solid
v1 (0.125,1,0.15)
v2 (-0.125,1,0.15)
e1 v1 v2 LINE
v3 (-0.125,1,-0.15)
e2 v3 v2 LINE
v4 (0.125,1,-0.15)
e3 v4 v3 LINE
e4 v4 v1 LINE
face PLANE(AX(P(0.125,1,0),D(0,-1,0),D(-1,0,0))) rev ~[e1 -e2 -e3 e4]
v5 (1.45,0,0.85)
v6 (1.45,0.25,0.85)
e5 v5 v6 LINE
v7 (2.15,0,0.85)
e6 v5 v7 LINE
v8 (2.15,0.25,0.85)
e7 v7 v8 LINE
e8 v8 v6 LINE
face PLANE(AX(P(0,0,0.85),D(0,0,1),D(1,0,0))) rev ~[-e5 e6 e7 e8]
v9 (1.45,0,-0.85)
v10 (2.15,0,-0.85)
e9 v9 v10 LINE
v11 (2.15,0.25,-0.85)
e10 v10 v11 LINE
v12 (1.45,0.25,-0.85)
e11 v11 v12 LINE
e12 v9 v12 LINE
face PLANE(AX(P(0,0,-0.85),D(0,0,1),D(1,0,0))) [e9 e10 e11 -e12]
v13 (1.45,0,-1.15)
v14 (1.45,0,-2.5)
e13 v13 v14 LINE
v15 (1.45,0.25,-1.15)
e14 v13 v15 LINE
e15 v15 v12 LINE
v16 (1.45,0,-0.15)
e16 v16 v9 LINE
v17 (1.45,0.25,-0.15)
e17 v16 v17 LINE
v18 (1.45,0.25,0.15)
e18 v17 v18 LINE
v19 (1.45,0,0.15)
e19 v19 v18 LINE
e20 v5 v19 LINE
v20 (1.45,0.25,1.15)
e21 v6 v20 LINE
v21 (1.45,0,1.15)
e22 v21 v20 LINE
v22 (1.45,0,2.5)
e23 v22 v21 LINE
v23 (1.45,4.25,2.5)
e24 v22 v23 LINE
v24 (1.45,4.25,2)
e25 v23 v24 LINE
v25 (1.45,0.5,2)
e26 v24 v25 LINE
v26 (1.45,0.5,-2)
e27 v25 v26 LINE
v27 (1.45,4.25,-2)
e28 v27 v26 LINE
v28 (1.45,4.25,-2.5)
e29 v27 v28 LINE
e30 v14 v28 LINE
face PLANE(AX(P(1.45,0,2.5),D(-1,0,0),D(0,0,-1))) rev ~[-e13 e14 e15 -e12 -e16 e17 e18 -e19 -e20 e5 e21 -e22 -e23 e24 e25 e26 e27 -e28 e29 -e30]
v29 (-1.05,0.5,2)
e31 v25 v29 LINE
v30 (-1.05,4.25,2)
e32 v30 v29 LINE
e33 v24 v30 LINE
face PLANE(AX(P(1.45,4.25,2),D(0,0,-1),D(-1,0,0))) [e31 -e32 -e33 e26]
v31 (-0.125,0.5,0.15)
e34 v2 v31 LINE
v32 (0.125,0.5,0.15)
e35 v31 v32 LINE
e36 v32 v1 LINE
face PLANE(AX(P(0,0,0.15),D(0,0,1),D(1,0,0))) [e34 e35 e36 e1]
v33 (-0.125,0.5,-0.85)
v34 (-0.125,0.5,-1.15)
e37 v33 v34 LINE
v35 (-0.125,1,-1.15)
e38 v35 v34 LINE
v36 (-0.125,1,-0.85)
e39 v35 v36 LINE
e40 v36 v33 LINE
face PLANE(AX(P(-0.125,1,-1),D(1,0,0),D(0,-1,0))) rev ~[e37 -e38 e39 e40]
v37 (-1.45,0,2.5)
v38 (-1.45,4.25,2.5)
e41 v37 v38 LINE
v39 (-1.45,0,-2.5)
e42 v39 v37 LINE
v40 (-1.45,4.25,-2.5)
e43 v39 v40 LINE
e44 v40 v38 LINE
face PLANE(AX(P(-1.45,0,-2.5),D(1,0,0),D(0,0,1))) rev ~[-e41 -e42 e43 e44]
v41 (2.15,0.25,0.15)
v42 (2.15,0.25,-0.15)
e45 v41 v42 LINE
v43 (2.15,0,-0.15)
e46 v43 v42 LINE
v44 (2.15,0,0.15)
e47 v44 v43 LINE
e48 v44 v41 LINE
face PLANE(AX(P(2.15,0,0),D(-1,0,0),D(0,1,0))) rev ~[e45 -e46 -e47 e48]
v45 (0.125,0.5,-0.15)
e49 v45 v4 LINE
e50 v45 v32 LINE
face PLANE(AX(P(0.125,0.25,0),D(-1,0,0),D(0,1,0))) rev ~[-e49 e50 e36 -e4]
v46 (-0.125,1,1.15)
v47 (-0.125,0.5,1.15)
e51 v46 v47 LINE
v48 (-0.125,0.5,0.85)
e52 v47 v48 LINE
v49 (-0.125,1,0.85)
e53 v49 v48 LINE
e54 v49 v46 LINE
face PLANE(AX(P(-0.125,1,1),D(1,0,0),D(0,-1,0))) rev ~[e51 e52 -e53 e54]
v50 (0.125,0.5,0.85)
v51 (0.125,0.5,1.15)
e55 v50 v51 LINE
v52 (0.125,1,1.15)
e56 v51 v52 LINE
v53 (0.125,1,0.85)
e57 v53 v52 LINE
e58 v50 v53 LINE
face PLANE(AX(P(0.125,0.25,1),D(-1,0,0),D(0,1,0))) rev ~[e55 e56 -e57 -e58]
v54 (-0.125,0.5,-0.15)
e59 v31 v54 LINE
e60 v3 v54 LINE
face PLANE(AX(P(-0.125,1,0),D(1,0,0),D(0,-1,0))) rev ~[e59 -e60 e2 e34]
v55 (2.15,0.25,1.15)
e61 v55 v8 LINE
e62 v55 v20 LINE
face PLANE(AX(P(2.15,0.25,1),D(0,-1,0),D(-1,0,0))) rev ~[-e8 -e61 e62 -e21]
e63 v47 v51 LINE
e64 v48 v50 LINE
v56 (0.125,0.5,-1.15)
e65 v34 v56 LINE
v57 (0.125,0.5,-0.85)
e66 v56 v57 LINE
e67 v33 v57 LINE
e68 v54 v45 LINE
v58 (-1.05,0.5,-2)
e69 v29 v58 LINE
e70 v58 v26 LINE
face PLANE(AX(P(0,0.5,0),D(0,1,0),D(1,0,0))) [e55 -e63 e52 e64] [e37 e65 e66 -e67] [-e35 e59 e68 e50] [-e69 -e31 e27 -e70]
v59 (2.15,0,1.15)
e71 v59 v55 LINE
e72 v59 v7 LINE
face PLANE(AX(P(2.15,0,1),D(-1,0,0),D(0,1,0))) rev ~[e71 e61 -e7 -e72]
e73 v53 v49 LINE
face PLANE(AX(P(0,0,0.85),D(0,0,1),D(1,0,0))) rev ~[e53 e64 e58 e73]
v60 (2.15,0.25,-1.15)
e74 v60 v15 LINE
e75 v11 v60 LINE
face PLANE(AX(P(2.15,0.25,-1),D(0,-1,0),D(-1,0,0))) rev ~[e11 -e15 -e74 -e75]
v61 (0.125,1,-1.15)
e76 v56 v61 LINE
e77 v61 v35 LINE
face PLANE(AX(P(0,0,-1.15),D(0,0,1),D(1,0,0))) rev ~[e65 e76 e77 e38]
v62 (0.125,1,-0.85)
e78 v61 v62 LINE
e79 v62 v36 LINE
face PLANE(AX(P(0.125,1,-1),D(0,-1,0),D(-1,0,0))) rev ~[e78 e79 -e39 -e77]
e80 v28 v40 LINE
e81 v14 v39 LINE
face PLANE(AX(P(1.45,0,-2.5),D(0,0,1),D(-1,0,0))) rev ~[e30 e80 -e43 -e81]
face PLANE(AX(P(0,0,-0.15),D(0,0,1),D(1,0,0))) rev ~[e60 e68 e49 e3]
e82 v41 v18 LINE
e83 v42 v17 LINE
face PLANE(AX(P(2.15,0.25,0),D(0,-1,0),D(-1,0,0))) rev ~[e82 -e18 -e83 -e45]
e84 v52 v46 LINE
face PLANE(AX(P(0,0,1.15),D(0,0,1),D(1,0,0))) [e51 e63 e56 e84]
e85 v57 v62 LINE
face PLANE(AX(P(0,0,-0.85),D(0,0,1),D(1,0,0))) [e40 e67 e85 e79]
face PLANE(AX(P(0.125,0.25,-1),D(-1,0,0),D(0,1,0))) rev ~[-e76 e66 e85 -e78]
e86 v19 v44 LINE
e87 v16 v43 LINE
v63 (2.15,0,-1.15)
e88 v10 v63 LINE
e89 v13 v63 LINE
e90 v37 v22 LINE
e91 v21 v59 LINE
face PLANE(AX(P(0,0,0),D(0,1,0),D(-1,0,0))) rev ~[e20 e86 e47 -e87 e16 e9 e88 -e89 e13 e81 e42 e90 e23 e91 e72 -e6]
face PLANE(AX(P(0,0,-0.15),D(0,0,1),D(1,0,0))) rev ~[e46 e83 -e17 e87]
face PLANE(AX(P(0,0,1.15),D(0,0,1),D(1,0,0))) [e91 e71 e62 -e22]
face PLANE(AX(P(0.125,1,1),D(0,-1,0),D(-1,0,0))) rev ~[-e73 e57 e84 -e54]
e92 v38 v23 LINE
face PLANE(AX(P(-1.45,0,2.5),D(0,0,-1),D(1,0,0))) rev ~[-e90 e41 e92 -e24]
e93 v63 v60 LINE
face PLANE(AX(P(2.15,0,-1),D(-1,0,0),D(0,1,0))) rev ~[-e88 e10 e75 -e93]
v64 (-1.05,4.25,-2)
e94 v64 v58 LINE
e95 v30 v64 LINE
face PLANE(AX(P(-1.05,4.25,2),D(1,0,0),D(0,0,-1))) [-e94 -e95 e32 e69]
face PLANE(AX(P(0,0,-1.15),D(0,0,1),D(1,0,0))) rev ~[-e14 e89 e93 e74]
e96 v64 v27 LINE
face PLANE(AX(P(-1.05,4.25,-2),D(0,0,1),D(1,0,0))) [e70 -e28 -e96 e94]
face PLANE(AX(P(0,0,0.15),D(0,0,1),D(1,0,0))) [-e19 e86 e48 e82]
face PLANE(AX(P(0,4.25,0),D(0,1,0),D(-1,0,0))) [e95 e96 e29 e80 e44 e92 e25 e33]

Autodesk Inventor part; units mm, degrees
ref_plane "YZ Plane" through (0, 0, 0) normal (1, 0, 0) x (0, 1, 0)
ref_plane "XZ Plane" through (0, 0, 0) normal (0, 1, 0) x (-1, 0, 0)
ref_plane "XY Plane" through (0, 0, 0) normal (0, 0, 1) x (1, 0, 0)
sketch "Sketch1" plane through (0, 0, 0) normal (0, 1, 0) x (-1, 0, 0)
  line L0 (1.45, 2.5) -> (-1.45, 2.5)
  line L1 (-1.45, 2.5) -> (-1.45, -2.5)
  line L2 (-1.45, -2.5) -> (1.45, -2.5)
  line L3 (1.45, -2.5) -> (1.45, 2.5)
  point P0 (0, 0)
  dimension "d0" = 2.9
  dimension "d1" = 1.45
  dimension "d2" = 5
  dimension "d3" = 2.5
extrude "Extrusion1" add sketch "Sketch1" along normal blind 4.25
sketch "Sketch2" plane through (0, 4.25, 0) normal (0, 1, 0) x (1, 0, 0)
  line L0 (1.45, -2.5) -> (1.45, 2.5) projected
  line L1 (1.45, -2) -> (-1.05, -2)
  line L2 (-1.05, -2) -> (-1.05, 2)
  line L3 (-1.05, 2) -> (1.45, 2)
  line L4 (1.45, 2) -> (1.45, -2)
  point P0 (0, 0)
  dimension "d6" = 4
  dimension "d7" = 2
  dimension "d8" = 2.5
extrude "Extrusion2" cut sketch "Sketch2" against normal blind 3.75
sketch "Sketch3" plane through (0, 0, 0) normal (0, 0, 1) x (1, 0, 0)
  line L0 (0.125, 1) -> (-0.125, 1)
  line L1 (-0.125, 1) -> (-0.125, 0)
  line L2 (-0.125, 0) -> (2.15, 0)
  line L3 (2.15, 0) -> (2.15, 0.25)
  line L4 (2.15, 0.25) -> (0.125, 0.25)
  line L5 (0.125, 0.25) -> (0.125, 1)
  point P0 (0, 0)
  dimension "d11" = 2.15
  dimension "d12" = 0
  dimension "d13" = 0.25
  dimension "d14" = 0.25
  dimension "d15" = 0.125
  dimension "d16" = 1
extrude "Extrusion3" add sketch "Sketch3" along normal mid plane 0.3
pattern_linear "Rectangular Pattern1" count 3 spacing 1 along (0, 0, 1) of "Extrusion3" first direction both ways yes
properties part number "RZ_3Pos_1mm_SM_Header"
